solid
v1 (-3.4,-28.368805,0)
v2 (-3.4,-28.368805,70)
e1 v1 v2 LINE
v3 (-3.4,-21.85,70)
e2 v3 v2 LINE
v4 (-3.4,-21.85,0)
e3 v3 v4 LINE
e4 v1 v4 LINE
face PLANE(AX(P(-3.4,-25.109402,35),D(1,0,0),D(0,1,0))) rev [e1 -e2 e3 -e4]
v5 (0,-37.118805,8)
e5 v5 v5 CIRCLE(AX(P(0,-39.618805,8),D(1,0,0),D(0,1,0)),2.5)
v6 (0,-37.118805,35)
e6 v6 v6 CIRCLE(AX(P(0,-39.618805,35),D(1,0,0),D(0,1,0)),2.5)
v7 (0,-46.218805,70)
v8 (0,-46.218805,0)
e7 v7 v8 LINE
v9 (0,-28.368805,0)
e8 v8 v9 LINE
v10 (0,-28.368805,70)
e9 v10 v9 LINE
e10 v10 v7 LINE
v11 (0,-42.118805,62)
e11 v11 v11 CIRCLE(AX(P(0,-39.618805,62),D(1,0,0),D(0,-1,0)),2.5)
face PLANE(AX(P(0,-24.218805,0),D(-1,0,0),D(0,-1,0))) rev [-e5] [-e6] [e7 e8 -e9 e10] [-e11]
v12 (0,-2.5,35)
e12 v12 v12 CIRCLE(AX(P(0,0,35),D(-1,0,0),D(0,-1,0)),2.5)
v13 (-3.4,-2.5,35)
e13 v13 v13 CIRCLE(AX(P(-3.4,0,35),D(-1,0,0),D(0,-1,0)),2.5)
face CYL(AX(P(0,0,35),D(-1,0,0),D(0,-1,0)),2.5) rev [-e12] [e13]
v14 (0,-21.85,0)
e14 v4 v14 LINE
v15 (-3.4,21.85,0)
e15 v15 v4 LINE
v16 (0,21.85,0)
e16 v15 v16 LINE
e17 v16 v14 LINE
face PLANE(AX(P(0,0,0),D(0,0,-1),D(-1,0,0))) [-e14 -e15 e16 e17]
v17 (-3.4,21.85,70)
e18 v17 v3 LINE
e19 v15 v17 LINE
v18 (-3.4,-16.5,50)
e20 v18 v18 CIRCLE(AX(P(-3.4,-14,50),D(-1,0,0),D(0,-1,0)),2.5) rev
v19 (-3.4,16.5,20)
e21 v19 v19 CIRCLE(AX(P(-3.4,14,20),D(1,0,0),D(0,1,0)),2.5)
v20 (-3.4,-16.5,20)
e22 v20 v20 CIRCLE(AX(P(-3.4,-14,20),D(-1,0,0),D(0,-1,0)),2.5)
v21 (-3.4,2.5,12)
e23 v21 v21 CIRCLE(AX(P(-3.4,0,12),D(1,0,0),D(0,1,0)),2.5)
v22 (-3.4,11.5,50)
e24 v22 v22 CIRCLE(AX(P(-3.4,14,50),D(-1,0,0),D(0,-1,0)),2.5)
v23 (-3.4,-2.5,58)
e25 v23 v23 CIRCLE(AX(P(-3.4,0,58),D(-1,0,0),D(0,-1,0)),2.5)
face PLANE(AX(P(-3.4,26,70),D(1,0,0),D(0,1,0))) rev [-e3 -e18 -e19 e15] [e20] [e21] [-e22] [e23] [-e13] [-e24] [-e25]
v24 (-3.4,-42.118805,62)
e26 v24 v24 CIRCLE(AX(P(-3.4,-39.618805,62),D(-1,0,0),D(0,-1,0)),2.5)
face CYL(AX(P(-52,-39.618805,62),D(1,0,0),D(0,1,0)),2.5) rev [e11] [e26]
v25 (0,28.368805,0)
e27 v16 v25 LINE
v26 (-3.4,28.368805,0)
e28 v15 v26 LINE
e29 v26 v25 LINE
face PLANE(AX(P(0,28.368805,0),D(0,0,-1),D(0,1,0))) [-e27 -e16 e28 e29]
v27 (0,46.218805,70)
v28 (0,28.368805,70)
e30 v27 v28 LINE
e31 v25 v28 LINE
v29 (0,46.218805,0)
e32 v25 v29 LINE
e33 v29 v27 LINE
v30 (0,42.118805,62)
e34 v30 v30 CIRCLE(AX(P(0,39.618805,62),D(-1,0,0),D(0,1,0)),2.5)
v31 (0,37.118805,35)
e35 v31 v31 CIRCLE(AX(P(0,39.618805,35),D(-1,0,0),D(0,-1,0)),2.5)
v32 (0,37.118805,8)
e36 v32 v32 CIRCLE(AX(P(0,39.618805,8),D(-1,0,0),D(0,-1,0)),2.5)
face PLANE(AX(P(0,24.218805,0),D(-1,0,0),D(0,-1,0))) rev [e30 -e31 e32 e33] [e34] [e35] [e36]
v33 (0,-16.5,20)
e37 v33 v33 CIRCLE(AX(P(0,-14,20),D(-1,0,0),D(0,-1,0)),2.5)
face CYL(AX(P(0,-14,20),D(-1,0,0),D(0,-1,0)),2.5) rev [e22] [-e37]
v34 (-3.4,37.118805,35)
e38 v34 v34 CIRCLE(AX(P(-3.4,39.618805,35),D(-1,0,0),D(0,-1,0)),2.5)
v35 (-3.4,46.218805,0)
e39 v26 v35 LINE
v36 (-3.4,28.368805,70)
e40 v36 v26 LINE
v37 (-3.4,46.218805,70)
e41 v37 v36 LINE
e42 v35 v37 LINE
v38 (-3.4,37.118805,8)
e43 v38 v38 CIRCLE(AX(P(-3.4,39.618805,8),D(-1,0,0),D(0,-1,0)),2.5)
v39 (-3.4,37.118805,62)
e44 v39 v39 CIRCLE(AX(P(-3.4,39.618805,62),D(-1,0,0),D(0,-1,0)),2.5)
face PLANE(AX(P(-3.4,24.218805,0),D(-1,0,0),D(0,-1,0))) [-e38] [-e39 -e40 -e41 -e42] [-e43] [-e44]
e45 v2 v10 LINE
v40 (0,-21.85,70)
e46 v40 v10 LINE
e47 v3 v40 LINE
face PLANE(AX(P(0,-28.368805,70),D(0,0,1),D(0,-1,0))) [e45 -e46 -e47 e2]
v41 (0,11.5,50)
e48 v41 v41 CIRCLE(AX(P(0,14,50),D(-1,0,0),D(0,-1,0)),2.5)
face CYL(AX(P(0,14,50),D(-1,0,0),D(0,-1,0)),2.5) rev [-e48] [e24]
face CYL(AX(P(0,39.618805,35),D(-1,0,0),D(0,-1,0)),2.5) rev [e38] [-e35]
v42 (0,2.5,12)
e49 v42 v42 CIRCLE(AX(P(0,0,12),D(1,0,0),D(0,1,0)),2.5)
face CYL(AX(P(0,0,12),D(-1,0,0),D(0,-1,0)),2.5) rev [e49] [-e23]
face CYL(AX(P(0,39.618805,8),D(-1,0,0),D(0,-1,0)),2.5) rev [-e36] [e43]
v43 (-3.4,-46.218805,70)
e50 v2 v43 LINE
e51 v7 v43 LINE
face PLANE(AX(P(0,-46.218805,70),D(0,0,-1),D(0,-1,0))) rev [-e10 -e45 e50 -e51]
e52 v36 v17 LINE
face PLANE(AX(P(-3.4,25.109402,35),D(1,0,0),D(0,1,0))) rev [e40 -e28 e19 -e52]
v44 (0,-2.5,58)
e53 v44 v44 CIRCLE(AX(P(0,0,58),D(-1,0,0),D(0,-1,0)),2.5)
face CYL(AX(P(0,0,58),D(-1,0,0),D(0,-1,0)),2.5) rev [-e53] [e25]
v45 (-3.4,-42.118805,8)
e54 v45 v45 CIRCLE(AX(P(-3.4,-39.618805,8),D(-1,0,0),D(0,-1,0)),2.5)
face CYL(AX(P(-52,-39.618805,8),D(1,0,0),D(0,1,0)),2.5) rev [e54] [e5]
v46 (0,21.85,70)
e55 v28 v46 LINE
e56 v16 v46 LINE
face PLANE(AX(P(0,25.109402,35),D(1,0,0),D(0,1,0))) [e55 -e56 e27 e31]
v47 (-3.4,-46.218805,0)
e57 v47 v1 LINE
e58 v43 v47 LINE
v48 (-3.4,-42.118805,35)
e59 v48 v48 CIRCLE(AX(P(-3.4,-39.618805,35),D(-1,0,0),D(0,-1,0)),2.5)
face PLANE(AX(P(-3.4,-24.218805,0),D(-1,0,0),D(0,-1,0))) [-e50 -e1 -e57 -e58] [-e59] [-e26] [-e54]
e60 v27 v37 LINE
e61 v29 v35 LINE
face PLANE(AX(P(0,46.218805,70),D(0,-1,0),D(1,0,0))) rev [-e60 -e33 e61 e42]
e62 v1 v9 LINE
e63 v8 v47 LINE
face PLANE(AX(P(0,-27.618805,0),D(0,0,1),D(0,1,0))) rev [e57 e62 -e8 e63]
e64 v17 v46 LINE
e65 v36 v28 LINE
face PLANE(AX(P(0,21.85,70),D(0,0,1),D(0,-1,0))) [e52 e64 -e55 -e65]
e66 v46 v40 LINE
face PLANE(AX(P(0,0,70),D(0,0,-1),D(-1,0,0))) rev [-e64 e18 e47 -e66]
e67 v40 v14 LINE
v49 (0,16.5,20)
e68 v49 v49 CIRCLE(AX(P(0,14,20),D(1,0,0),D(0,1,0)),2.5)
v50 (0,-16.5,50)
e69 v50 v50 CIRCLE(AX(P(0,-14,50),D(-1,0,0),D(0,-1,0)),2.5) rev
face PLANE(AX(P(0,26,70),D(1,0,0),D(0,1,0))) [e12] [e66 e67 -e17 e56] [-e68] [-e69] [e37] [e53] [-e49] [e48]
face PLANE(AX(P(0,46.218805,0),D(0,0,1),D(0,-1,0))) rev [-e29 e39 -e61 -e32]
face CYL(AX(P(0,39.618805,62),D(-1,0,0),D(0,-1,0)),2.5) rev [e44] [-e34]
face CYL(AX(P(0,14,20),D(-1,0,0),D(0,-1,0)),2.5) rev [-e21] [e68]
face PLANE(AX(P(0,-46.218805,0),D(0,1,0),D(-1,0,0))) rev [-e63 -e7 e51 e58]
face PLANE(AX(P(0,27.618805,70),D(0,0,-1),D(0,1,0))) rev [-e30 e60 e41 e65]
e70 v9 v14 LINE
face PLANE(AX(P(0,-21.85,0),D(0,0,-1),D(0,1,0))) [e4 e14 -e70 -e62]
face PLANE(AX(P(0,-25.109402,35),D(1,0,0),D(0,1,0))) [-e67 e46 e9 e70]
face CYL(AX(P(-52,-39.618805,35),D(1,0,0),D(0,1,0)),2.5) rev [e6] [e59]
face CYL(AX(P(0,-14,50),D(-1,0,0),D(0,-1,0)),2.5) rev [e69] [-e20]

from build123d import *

# Parameters (mm, degrees)
SKETCH11_W                     = 3.4
SKETCH11_H                     = 52
BASE_FLANGE3_DEPTH             = 70
EDGE_FLANGE1_STRIP_W           = 15.1
EDGE_FLANGE1_STRIP_H           = 3.4
EDGE_FLANGE1_STRIP_CUT_DEPTH   = 70
EDGE_FLANGE1_STRIP_2_W         = 15.1
EDGE_FLANGE1_STRIP_2_H         = 3.4
EDGE_FLANGE1_STRIP_CUT_2_DEPTH = 70
EDGE_FLANGE1_DEPTH             = 70
EDGE_FLANGE1_BEND_DEPTH        = 70
CUT_EXTRUDE1_DEPTH             = 89.011135659
CUT_EXTRUDE1_DEPTH_BACK        = 89.011135659
SKETCH25_R                     = 2.5
SKETCH23_R                     = 2.5
CUT_EXTRUDE2_DEPTH             = 77.954272136
UNFOLD1_START                  = -22
UNFOLD1_OUTLINE_W              = 4.15
UNFOLD1_OUTLINE_H              = 70
UNFOLD1_DEPTH                  = 18.6
UNFOLD1_START_2                = -3.4
UNFOLD1_2_OUTLINE_W            = 24.368804756
UNFOLD1_2_OUTLINE_H            = 70
UNFOLD1_2_OUTLINE_R            = 2.5
UNFOLD1_2_DEPTH                = 3.4


with BuildPart() as part:
    # Base-Flange3: sheet metal written as solids
    # Sketch11 → Base-Flange3 (new body)
    with BuildSketch(Plane.XY):
        with Locations((-1.7, 0)):
            Rectangle(SKETCH11_W, SKETCH11_H)
    extrude(amount=BASE_FLANGE3_DEPTH)

    # Edge-Flange1: sheet metal written as solids
    # Edge-Flange1 strip (on a plane across the edge) → Edge-Flange1 strip cut (cut)
    with BuildSketch(Plane(origin=(-3.4, 26, 70), x_dir=(0, -1, 0), z_dir=(0, 0, -1))):
        with Locations((-3.4, -1.7)):
            Rectangle(EDGE_FLANGE1_STRIP_W, EDGE_FLANGE1_STRIP_H)
    extrude(amount=EDGE_FLANGE1_STRIP_CUT_DEPTH, mode=Mode.SUBTRACT)

    # Edge-Flange1 strip 2 (on a plane across the edge) → Edge-Flange1 strip cut 2 (cut)
    with BuildSketch(Plane(origin=(-3.4, -26, 0), x_dir=(0, 1, 0), z_dir=(0, 0, 1))):
        with Locations((-3.4, -1.7)):
            Rectangle(EDGE_FLANGE1_STRIP_2_W, EDGE_FLANGE1_STRIP_2_H)
    extrude(amount=EDGE_FLANGE1_STRIP_CUT_2_DEPTH, mode=Mode.SUBTRACT)

    # Edge-Flange1 section (on a plane across the edge) → Edge-Flange1 (add)
    with BuildSketch(Plane(origin=(-3.4, 26, 70), x_dir=(0, -1, 0), z_dir=(0, 0, -1))):
        with BuildLine():
            Line((0, 0.75), (0, 18.6))
            Line((0, 18.6), (3.4, 18.6))
            Line((3.4, 18.6), (3.4, 0.75))
            ThreePointArc((3.4, 0.75), (3.619669914, 0.219669914), (4.15, 0))
            Line((4.15, 0), (4.15, -3.4))
            ThreePointArc((4.15, -3.4), (1.215506858, -2.184493142), (0, 0.75))
        make_face()
    extrude(amount=EDGE_FLANGE1_DEPTH)

    # Edge-Flange1 section 2 (on a plane across the edge) → Edge-Flange1 bend (add)
    with BuildSketch(Plane(origin=(-3.4, -26, 0), x_dir=(0, 1, 0), z_dir=(0, 0, 1))):
        with BuildLine():
            Line((0, 0.75), (0, 18.6))
            Line((0, 18.6), (3.4, 18.6))
            Line((3.4, 18.6), (3.4, 0.75))
            ThreePointArc((3.4, 0.75), (3.619669914, 0.219669914), (4.15, 0))
            Line((4.15, 0), (4.15, -3.4))
            ThreePointArc((4.15, -3.4), (1.215506858, -2.184493142), (0, 0.75))
        make_face()
    extrude(amount=EDGE_FLANGE1_BEND_DEPTH)

    # Sketch25 → Cut-Extrude1 (cut, two sides: drawn at the far end of the back side and taken through both)
    with BuildSketch(Plane.XZ.offset(-22.6).offset(-CUT_EXTRUDE1_DEPTH_BACK)):
        with Locations((-15.4, 35)):
            Circle(SKETCH25_R)
        with Locations((-15.4, 8)):
            Circle(SKETCH25_R)
        with Locations(Location((-15.4, 62, 0), (0, 0, 180))):
            Circle(SKETCH25_R)
    extrude(amount=CUT_EXTRUDE1_DEPTH + CUT_EXTRUDE1_DEPTH_BACK, mode=Mode.SUBTRACT)

    # Sketch23 → Cut-Extrude2 (cut, through all)
    with BuildSketch(Plane.ZY.offset(3.4)):
        with Locations(Location((20, -14, 0), (0, 0, 270))):
            Circle(SKETCH23_R)
        with Locations(Location((50, -14, 0), (0, 0, 270))):
            Circle(SKETCH23_R)
        with Locations(Location((20, 14, 0), (0, 0, 90))):
            Circle(SKETCH23_R)
        with Locations(Location((50, 14, 0), (0, 0, 270))):
            Circle(SKETCH23_R)
        with Locations(Location((35, 0, 0), (0, 0, 270))):
            Circle(SKETCH23_R)
        with Locations(Location((58, 0, 0), (0, 0, 270))):
            Circle(SKETCH23_R)
        with Locations(Location((12, 0, 0), (0, 0, 90))):
            Circle(SKETCH23_R)
    extrude(amount=-CUT_EXTRUDE2_DEPTH, mode=Mode.SUBTRACT)

    # Unfold1: read off the stored shape, not the designer's step
    # Unfold1 outline → Unfold1 (cut)
    with BuildSketch(Plane.YZ.offset(UNFOLD1_START)):
        with Locations((-23.925, 35)):
            Rectangle(UNFOLD1_OUTLINE_W, UNFOLD1_OUTLINE_H)
        with Locations((23.925, 35)):
            Rectangle(UNFOLD1_OUTLINE_W, UNFOLD1_OUTLINE_H)
    extrude(amount=UNFOLD1_DEPTH, mode=Mode.SUBTRACT)

    # Unfold1 2 outline → Unfold1 2 (add)
    # profile 1 of 2: a face of its own
    with BuildSketch(Plane.YZ.offset(UNFOLD1_START_2)):
        with Locations((-34.034402378, 35)):
            Rectangle(UNFOLD1_2_OUTLINE_W, UNFOLD1_2_OUTLINE_H)
        with Locations((-39.618804756, 8)):
            Circle(UNFOLD1_2_OUTLINE_R, mode=Mode.SUBTRACT)
        with Locations((-39.618804756, 35)):
            Circle(UNFOLD1_2_OUTLINE_R, mode=Mode.SUBTRACT)
        with Locations((-39.618804756, 62)):
            Circle(UNFOLD1_2_OUTLINE_R, mode=Mode.SUBTRACT)
    # profile 2 of 2: a face of its own
    with BuildSketch(Plane.YZ.offset(UNFOLD1_START_2)):
        with Locations((34.034402378, 35)):
            Rectangle(UNFOLD1_2_OUTLINE_W, UNFOLD1_2_OUTLINE_H)
        with Locations((39.618804756, 8)):
            Circle(UNFOLD1_2_OUTLINE_R, mode=Mode.SUBTRACT)
        with Locations((39.618804756, 35)):
            Circle(UNFOLD1_2_OUTLINE_R, mode=Mode.SUBTRACT)
        with Locations((39.618804756, 62)):
            Circle(UNFOLD1_2_OUTLINE_R, mode=Mode.SUBTRACT)
    extrude(amount=UNFOLD1_2_DEPTH)


solid = part.part
